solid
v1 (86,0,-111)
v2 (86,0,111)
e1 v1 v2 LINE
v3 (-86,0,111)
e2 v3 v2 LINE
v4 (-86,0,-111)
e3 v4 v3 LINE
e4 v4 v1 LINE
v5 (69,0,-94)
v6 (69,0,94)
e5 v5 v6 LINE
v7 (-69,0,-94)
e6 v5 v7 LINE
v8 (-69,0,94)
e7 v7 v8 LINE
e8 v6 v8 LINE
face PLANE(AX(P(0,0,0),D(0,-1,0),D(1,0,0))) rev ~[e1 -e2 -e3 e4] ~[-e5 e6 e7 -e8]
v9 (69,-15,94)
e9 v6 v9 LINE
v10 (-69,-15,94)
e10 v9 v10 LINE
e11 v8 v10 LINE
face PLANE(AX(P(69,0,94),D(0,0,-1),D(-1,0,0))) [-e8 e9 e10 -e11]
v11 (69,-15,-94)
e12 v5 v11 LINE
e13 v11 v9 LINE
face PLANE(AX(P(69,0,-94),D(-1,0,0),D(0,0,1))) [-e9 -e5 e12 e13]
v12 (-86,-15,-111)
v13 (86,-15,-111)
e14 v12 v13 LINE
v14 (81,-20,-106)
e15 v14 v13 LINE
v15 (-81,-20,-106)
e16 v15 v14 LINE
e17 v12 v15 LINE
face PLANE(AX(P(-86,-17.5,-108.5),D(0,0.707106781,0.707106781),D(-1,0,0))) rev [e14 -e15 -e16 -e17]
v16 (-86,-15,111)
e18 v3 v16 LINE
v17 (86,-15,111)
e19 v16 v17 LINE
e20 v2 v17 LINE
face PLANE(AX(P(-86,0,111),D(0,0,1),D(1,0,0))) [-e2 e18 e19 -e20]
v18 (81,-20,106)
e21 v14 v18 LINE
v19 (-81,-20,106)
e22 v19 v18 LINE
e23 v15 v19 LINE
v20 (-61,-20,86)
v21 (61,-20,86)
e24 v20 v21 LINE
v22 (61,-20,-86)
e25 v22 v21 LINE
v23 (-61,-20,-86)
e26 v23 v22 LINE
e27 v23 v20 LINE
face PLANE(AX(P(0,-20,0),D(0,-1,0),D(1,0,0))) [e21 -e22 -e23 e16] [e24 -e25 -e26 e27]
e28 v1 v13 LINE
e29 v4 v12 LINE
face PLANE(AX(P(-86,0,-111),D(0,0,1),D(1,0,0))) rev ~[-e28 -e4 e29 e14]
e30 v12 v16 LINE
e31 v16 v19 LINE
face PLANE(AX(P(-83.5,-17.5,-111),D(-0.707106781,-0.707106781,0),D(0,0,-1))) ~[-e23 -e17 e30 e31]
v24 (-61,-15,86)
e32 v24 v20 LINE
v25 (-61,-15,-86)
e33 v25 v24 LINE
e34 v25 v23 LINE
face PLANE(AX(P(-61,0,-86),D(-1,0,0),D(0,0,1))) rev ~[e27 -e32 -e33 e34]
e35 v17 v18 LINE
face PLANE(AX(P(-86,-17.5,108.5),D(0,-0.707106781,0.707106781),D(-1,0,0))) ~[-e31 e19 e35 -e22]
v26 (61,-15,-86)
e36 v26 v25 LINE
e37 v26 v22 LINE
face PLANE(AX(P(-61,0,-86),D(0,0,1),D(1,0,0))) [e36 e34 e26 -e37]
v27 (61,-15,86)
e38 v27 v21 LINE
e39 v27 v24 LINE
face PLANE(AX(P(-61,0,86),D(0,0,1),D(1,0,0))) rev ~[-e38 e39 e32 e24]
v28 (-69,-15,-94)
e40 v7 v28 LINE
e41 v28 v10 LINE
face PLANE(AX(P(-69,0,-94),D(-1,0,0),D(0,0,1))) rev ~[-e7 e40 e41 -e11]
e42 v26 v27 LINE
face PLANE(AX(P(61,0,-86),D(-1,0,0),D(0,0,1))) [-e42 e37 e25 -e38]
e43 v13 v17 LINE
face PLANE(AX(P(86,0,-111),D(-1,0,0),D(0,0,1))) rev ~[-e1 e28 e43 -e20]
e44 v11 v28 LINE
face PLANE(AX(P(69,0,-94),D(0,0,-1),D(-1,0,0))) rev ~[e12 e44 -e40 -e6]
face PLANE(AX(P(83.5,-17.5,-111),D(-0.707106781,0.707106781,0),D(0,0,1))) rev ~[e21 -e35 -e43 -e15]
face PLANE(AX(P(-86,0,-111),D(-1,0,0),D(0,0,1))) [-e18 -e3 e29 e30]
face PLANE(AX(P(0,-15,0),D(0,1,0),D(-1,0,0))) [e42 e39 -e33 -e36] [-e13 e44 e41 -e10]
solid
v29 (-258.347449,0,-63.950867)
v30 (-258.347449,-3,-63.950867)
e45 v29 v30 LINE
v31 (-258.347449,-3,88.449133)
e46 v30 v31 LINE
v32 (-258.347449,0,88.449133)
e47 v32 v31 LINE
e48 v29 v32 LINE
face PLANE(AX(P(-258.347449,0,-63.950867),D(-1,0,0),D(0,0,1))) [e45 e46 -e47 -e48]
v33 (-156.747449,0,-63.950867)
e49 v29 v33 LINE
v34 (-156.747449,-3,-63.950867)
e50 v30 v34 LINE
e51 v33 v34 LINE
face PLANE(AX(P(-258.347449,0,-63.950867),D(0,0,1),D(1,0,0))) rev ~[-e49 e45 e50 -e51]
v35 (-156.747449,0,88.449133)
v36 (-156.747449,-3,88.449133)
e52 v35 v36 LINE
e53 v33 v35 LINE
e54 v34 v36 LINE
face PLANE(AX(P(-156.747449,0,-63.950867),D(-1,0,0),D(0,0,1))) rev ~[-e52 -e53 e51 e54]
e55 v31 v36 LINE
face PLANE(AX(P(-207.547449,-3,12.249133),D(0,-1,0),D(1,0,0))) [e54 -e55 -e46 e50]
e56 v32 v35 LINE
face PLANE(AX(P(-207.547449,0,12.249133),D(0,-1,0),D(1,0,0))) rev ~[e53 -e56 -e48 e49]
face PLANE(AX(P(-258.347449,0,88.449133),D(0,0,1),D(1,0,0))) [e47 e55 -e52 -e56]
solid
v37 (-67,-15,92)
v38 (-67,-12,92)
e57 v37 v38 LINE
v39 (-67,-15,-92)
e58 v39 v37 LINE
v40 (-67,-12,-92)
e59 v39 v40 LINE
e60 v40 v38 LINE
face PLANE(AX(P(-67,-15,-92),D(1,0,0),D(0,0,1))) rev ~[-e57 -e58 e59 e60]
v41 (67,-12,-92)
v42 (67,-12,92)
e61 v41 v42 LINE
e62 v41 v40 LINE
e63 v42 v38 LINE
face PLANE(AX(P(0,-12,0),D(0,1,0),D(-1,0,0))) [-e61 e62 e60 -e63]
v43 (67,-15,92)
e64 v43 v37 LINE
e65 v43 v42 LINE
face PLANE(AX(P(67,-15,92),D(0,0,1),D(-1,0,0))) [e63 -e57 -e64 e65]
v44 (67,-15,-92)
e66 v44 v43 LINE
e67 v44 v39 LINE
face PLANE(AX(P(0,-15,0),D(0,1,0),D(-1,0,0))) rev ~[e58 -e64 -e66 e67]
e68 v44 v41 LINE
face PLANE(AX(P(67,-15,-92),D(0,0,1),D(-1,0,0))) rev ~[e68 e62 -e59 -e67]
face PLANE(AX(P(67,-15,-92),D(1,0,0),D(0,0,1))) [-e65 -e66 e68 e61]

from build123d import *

# Parameters (mm, degrees)
F0_W     = 172
F0_H     = 222
F0_W_2   = 122
F0_H_2   = 172
F1_DEPTH = 20
F2_W     = 138
F2_H     = 188
F2_W_2   = 122
F2_H_2   = 172
F3_DEPTH = 15
F4_SIZE  = 5
F5_W     = 101.6
F5_H     = 152.4
F6_DEPTH = 3
F8_W     = 134
F8_H     = 184
F9_DEPTH = 3


# Not quite as in the source:
# - a feature names something its author has since deleted; it is built from what else it names


with BuildPart() as f1:
    # F0 (on Front) → F1 (new body)
    with BuildSketch(Plane.XZ):
        Rectangle(F0_W, F0_H)
        Rectangle(F0_W_2, F0_H_2, mode=Mode.SUBTRACT)
    extrude(amount=F1_DEPTH)

    # F2 (on face) → F3 (cut)
    with BuildSketch(Plane(origin=(0, 0, 0), x_dir=(-1, 0, 0), z_dir=(0, 1, 0))):
        Rectangle(F2_W, F2_H)
        Rectangle(F2_W_2, F2_H_2, mode=Mode.SUBTRACT)
    extrude(amount=-F3_DEPTH, mode=Mode.SUBTRACT)

    # F4
    f4_edges = [f1.edges().sort_by_distance(p)[0] for p in [
        (-86, -20, 0),
        (0, -20, 111),
        (86, -20, 0),
        (0, -20, -111),
    ]]
    chamfer(f4_edges, length=F4_SIZE)


with BuildPart() as f6:
    # F5 (on Front) → F6 (new body)
    with BuildSketch(Plane.XZ):
        with Locations((-207.5474485755, 12.2491330458)):
            Rectangle(F5_W, F5_H)
    extrude(amount=F6_DEPTH)


with BuildPart() as f9:
    # F8 (on face) → F9 (new body)
    with BuildSketch(Plane(origin=(0, -15, 0), x_dir=(-1, 0, 0), z_dir=(0, 1, 0))):
        Rectangle(F8_W, F8_H)
    extrude(amount=F9_DEPTH)


solid = Compound([f1.part, f6.part, f9.part])
